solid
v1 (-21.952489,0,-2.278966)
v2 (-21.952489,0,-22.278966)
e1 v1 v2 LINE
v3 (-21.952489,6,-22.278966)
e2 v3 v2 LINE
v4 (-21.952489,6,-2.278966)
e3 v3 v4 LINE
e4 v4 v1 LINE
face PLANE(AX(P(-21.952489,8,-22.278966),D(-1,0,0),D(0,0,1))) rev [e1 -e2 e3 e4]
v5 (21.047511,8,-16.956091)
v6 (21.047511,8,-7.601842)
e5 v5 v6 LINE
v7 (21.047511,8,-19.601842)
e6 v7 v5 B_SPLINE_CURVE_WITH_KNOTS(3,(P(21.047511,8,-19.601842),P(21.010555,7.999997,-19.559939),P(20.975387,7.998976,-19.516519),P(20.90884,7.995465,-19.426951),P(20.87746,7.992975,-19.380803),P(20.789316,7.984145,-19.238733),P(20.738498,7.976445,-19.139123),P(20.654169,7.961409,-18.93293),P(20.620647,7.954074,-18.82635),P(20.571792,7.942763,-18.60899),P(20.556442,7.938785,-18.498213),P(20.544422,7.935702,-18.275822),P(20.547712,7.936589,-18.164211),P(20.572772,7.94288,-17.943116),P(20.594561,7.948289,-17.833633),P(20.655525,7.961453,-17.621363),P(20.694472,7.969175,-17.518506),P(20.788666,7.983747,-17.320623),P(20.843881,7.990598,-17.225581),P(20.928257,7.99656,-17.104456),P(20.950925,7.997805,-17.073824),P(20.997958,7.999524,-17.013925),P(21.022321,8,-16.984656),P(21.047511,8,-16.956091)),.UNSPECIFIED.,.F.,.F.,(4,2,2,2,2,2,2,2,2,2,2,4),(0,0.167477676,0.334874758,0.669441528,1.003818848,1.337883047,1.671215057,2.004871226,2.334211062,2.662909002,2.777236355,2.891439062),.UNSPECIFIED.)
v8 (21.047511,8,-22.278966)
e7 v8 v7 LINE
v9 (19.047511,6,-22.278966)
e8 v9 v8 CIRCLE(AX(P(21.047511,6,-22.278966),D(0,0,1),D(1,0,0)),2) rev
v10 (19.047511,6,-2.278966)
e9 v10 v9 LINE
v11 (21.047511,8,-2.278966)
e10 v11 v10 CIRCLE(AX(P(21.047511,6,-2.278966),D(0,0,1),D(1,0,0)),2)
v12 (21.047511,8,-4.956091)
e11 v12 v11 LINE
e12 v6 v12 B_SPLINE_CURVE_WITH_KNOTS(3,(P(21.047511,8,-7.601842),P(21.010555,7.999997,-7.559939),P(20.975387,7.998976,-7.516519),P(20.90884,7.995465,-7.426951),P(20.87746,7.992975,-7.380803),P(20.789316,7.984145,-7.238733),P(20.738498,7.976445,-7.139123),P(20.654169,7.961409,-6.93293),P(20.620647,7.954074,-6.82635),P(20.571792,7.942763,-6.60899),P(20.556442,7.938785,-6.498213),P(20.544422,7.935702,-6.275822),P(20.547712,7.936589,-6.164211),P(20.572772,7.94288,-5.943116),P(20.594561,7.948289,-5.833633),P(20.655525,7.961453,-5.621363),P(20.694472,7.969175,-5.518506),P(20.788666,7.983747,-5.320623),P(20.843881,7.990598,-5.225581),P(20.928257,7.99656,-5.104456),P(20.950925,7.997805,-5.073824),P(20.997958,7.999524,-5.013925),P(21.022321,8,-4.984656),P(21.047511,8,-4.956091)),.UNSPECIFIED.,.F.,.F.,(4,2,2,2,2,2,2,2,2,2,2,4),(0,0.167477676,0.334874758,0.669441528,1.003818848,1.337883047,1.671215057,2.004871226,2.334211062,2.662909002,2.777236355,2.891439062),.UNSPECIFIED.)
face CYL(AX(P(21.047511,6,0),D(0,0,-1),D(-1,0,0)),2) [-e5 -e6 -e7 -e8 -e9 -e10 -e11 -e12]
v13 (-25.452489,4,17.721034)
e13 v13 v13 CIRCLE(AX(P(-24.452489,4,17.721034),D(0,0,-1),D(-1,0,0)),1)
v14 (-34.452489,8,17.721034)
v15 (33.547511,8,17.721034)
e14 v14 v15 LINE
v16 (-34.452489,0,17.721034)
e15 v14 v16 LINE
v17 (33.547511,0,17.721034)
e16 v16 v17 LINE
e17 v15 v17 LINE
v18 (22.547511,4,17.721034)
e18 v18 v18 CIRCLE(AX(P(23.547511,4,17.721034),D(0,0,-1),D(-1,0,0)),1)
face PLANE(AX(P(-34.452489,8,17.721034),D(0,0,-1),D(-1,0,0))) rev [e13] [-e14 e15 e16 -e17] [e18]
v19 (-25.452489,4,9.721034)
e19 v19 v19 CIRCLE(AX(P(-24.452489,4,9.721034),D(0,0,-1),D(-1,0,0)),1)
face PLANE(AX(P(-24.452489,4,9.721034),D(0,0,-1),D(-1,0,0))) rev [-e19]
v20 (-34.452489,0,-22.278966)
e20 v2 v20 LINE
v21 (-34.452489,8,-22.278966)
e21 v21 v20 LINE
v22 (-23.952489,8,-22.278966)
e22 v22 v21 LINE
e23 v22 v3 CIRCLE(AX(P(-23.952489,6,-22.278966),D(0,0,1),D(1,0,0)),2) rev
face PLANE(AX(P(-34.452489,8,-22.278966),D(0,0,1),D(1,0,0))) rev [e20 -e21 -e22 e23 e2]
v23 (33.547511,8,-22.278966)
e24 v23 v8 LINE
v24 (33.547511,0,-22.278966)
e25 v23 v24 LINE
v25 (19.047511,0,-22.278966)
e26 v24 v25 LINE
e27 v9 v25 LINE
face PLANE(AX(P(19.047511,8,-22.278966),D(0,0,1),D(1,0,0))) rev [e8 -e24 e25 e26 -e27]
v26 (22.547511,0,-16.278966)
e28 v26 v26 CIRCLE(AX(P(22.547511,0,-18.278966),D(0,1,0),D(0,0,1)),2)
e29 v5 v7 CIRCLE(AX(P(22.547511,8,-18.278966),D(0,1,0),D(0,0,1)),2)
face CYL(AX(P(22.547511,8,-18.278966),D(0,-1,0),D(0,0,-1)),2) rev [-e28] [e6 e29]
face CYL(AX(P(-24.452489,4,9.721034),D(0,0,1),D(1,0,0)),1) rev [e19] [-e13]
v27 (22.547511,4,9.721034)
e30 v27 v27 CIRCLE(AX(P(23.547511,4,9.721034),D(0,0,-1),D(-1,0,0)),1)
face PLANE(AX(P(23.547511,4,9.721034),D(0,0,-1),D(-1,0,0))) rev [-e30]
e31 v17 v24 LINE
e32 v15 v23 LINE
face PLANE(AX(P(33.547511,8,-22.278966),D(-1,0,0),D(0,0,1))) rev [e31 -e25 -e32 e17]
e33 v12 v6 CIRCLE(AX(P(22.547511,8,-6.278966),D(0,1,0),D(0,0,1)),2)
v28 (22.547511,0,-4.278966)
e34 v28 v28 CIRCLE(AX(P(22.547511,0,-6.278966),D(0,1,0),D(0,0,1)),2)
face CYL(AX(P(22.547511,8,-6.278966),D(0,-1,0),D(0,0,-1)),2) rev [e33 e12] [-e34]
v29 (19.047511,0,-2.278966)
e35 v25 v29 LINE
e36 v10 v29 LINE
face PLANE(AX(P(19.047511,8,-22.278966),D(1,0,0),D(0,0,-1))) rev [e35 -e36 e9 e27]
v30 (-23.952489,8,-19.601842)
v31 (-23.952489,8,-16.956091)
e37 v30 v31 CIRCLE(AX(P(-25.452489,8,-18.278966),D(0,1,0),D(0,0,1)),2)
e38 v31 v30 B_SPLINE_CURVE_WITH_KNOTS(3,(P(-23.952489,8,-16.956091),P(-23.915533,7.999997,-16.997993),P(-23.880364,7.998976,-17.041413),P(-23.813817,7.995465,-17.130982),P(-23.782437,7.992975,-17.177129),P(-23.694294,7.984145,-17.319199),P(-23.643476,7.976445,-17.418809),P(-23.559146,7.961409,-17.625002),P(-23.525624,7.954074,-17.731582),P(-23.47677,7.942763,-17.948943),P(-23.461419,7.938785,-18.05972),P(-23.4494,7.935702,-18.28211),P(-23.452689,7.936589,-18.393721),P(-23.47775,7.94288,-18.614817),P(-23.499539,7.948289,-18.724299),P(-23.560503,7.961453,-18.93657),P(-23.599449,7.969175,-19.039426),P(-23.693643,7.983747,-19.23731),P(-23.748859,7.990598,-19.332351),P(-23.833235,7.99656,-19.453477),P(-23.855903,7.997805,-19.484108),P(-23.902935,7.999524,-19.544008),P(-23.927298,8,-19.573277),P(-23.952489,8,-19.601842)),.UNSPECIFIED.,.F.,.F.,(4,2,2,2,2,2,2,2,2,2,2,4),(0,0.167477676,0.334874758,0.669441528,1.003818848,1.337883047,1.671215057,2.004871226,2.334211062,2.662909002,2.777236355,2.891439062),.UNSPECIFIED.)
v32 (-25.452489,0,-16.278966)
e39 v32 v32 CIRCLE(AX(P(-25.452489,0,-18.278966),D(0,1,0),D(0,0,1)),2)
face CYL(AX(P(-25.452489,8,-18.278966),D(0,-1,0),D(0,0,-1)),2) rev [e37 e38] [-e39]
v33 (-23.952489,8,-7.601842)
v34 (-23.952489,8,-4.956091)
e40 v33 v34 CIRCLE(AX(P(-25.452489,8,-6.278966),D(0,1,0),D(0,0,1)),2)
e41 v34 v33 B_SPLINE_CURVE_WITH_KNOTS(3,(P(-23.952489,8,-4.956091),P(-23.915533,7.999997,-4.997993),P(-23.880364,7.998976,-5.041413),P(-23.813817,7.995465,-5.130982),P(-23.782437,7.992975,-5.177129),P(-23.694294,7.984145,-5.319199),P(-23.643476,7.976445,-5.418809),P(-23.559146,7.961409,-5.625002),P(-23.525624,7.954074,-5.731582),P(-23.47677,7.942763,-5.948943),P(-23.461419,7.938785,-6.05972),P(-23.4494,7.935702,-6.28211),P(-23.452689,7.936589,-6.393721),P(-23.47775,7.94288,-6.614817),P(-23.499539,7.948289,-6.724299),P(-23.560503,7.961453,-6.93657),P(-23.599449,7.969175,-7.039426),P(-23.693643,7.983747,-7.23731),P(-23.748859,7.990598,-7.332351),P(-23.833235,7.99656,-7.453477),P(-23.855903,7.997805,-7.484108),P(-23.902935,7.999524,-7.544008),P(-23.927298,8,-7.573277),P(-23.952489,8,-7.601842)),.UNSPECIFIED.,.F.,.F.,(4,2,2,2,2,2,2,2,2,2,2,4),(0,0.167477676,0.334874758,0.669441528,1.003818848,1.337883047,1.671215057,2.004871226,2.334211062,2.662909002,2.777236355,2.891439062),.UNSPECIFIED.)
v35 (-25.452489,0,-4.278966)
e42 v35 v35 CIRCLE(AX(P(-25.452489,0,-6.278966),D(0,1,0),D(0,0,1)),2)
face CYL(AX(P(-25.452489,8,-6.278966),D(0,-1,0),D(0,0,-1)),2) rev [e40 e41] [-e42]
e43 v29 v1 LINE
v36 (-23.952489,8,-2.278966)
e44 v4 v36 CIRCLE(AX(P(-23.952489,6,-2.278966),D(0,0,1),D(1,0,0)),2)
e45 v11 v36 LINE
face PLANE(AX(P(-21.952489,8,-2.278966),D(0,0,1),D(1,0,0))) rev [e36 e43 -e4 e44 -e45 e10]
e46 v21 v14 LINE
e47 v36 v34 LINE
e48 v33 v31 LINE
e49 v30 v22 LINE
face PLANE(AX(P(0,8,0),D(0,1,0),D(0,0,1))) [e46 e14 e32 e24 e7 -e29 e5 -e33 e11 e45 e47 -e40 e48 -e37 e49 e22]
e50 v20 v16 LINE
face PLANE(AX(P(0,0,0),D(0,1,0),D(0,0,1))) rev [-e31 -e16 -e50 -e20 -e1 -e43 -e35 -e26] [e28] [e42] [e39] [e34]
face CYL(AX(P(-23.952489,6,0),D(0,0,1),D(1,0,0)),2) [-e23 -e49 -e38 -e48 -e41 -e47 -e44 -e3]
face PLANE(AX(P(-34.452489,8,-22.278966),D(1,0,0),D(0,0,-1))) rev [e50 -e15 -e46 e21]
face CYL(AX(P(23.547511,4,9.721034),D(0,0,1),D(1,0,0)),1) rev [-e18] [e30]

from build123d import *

# Parameters (mm, degrees)
SKETCH1_R           = 2
BOSS_EXTRUDE1_DEPTH = 8
CUT_EXTRUDE1_START  = 17.721034
SKETCH2_R           = 1
CUT_EXTRUDE1_DEPTH  = 8
FILLET1_R           = 2


with BuildPart() as part:
    # Sketch1 → Boss-Extrude1 (new body)
    with BuildSketch(Plane(origin=(0, 0, 0), x_dir=(1, 0, 0), z_dir=(0, 1, 0))):
        Polygon((19.047511312, 22.278966214), (33.547511312, 22.278966214), (33.547511312, -17.721033786), (-34.452488688, -17.721033786), (-34.452488688, 22.278966214), (-21.952488688, 22.278966214), (-21.952488688, 2.278966214), (19.047511312, 2.278966214), align=None)
        with Locations(Location((-25.452488688, 18.278966214, 0), (0, 0, 270))):
            Circle(SKETCH1_R, mode=Mode.SUBTRACT)
        with Locations(Location((-25.452488688, 6.278966214, 0), (0, 0, 270))):
            Circle(SKETCH1_R, mode=Mode.SUBTRACT)
        with Locations(Location((22.547511312, 18.278966214, 0), (0, 0, 270))):
            Circle(SKETCH1_R, mode=Mode.SUBTRACT)
        with Locations(Location((22.547511312, 6.278966214, 0), (0, 0, 270))):
            Circle(SKETCH1_R, mode=Mode.SUBTRACT)
    extrude(amount=BOSS_EXTRUDE1_DEPTH)

    # Sketch2 → Cut-Extrude1 (cut)
    with BuildSketch(Plane.XY.offset(CUT_EXTRUDE1_START)):
        with Locations(Location((-24.452488688, 4, 0), (0, 0, 180))):
            Circle(SKETCH2_R)
        with Locations(Location((23.547511312, 4, 0), (0, 0, 180))):
            Circle(SKETCH2_R)
    extrude(amount=-CUT_EXTRUDE1_DEPTH, mode=Mode.SUBTRACT)

    # Fillet1
    # the kernel refuses this fillet: 2 mm, written as the material it takes off along each edge
    with BuildSketch(Plane(origin=(19.047511312, 8, -2.278966214), x_dir=(0, -1, 0), z_dir=(0, 0, -1))) as fillet1_piece_1:
        with BuildLine():
            CenterArc((FILLET1_R, -FILLET1_R), FILLET1_R, 90, 90)
            Line((0, -FILLET1_R), (0, 0))
            Line((0, 0), (FILLET1_R, 0))
        make_face()
    extrude(amount=25, mode=Mode.SUBTRACT)
    with BuildSketch(Plane(origin=(-21.952488688, 8, -27.278966214), x_dir=(-1, 0, 0), z_dir=(0, 0, 1))) as fillet1_piece_2:
        with BuildLine():
            CenterArc((FILLET1_R, FILLET1_R), FILLET1_R, 180, 90)
            Line((0, FILLET1_R), (0, 0))
            Line((0, 0), (FILLET1_R, 0))
        make_face()
    extrude(amount=25, mode=Mode.SUBTRACT)


solid = part.part
